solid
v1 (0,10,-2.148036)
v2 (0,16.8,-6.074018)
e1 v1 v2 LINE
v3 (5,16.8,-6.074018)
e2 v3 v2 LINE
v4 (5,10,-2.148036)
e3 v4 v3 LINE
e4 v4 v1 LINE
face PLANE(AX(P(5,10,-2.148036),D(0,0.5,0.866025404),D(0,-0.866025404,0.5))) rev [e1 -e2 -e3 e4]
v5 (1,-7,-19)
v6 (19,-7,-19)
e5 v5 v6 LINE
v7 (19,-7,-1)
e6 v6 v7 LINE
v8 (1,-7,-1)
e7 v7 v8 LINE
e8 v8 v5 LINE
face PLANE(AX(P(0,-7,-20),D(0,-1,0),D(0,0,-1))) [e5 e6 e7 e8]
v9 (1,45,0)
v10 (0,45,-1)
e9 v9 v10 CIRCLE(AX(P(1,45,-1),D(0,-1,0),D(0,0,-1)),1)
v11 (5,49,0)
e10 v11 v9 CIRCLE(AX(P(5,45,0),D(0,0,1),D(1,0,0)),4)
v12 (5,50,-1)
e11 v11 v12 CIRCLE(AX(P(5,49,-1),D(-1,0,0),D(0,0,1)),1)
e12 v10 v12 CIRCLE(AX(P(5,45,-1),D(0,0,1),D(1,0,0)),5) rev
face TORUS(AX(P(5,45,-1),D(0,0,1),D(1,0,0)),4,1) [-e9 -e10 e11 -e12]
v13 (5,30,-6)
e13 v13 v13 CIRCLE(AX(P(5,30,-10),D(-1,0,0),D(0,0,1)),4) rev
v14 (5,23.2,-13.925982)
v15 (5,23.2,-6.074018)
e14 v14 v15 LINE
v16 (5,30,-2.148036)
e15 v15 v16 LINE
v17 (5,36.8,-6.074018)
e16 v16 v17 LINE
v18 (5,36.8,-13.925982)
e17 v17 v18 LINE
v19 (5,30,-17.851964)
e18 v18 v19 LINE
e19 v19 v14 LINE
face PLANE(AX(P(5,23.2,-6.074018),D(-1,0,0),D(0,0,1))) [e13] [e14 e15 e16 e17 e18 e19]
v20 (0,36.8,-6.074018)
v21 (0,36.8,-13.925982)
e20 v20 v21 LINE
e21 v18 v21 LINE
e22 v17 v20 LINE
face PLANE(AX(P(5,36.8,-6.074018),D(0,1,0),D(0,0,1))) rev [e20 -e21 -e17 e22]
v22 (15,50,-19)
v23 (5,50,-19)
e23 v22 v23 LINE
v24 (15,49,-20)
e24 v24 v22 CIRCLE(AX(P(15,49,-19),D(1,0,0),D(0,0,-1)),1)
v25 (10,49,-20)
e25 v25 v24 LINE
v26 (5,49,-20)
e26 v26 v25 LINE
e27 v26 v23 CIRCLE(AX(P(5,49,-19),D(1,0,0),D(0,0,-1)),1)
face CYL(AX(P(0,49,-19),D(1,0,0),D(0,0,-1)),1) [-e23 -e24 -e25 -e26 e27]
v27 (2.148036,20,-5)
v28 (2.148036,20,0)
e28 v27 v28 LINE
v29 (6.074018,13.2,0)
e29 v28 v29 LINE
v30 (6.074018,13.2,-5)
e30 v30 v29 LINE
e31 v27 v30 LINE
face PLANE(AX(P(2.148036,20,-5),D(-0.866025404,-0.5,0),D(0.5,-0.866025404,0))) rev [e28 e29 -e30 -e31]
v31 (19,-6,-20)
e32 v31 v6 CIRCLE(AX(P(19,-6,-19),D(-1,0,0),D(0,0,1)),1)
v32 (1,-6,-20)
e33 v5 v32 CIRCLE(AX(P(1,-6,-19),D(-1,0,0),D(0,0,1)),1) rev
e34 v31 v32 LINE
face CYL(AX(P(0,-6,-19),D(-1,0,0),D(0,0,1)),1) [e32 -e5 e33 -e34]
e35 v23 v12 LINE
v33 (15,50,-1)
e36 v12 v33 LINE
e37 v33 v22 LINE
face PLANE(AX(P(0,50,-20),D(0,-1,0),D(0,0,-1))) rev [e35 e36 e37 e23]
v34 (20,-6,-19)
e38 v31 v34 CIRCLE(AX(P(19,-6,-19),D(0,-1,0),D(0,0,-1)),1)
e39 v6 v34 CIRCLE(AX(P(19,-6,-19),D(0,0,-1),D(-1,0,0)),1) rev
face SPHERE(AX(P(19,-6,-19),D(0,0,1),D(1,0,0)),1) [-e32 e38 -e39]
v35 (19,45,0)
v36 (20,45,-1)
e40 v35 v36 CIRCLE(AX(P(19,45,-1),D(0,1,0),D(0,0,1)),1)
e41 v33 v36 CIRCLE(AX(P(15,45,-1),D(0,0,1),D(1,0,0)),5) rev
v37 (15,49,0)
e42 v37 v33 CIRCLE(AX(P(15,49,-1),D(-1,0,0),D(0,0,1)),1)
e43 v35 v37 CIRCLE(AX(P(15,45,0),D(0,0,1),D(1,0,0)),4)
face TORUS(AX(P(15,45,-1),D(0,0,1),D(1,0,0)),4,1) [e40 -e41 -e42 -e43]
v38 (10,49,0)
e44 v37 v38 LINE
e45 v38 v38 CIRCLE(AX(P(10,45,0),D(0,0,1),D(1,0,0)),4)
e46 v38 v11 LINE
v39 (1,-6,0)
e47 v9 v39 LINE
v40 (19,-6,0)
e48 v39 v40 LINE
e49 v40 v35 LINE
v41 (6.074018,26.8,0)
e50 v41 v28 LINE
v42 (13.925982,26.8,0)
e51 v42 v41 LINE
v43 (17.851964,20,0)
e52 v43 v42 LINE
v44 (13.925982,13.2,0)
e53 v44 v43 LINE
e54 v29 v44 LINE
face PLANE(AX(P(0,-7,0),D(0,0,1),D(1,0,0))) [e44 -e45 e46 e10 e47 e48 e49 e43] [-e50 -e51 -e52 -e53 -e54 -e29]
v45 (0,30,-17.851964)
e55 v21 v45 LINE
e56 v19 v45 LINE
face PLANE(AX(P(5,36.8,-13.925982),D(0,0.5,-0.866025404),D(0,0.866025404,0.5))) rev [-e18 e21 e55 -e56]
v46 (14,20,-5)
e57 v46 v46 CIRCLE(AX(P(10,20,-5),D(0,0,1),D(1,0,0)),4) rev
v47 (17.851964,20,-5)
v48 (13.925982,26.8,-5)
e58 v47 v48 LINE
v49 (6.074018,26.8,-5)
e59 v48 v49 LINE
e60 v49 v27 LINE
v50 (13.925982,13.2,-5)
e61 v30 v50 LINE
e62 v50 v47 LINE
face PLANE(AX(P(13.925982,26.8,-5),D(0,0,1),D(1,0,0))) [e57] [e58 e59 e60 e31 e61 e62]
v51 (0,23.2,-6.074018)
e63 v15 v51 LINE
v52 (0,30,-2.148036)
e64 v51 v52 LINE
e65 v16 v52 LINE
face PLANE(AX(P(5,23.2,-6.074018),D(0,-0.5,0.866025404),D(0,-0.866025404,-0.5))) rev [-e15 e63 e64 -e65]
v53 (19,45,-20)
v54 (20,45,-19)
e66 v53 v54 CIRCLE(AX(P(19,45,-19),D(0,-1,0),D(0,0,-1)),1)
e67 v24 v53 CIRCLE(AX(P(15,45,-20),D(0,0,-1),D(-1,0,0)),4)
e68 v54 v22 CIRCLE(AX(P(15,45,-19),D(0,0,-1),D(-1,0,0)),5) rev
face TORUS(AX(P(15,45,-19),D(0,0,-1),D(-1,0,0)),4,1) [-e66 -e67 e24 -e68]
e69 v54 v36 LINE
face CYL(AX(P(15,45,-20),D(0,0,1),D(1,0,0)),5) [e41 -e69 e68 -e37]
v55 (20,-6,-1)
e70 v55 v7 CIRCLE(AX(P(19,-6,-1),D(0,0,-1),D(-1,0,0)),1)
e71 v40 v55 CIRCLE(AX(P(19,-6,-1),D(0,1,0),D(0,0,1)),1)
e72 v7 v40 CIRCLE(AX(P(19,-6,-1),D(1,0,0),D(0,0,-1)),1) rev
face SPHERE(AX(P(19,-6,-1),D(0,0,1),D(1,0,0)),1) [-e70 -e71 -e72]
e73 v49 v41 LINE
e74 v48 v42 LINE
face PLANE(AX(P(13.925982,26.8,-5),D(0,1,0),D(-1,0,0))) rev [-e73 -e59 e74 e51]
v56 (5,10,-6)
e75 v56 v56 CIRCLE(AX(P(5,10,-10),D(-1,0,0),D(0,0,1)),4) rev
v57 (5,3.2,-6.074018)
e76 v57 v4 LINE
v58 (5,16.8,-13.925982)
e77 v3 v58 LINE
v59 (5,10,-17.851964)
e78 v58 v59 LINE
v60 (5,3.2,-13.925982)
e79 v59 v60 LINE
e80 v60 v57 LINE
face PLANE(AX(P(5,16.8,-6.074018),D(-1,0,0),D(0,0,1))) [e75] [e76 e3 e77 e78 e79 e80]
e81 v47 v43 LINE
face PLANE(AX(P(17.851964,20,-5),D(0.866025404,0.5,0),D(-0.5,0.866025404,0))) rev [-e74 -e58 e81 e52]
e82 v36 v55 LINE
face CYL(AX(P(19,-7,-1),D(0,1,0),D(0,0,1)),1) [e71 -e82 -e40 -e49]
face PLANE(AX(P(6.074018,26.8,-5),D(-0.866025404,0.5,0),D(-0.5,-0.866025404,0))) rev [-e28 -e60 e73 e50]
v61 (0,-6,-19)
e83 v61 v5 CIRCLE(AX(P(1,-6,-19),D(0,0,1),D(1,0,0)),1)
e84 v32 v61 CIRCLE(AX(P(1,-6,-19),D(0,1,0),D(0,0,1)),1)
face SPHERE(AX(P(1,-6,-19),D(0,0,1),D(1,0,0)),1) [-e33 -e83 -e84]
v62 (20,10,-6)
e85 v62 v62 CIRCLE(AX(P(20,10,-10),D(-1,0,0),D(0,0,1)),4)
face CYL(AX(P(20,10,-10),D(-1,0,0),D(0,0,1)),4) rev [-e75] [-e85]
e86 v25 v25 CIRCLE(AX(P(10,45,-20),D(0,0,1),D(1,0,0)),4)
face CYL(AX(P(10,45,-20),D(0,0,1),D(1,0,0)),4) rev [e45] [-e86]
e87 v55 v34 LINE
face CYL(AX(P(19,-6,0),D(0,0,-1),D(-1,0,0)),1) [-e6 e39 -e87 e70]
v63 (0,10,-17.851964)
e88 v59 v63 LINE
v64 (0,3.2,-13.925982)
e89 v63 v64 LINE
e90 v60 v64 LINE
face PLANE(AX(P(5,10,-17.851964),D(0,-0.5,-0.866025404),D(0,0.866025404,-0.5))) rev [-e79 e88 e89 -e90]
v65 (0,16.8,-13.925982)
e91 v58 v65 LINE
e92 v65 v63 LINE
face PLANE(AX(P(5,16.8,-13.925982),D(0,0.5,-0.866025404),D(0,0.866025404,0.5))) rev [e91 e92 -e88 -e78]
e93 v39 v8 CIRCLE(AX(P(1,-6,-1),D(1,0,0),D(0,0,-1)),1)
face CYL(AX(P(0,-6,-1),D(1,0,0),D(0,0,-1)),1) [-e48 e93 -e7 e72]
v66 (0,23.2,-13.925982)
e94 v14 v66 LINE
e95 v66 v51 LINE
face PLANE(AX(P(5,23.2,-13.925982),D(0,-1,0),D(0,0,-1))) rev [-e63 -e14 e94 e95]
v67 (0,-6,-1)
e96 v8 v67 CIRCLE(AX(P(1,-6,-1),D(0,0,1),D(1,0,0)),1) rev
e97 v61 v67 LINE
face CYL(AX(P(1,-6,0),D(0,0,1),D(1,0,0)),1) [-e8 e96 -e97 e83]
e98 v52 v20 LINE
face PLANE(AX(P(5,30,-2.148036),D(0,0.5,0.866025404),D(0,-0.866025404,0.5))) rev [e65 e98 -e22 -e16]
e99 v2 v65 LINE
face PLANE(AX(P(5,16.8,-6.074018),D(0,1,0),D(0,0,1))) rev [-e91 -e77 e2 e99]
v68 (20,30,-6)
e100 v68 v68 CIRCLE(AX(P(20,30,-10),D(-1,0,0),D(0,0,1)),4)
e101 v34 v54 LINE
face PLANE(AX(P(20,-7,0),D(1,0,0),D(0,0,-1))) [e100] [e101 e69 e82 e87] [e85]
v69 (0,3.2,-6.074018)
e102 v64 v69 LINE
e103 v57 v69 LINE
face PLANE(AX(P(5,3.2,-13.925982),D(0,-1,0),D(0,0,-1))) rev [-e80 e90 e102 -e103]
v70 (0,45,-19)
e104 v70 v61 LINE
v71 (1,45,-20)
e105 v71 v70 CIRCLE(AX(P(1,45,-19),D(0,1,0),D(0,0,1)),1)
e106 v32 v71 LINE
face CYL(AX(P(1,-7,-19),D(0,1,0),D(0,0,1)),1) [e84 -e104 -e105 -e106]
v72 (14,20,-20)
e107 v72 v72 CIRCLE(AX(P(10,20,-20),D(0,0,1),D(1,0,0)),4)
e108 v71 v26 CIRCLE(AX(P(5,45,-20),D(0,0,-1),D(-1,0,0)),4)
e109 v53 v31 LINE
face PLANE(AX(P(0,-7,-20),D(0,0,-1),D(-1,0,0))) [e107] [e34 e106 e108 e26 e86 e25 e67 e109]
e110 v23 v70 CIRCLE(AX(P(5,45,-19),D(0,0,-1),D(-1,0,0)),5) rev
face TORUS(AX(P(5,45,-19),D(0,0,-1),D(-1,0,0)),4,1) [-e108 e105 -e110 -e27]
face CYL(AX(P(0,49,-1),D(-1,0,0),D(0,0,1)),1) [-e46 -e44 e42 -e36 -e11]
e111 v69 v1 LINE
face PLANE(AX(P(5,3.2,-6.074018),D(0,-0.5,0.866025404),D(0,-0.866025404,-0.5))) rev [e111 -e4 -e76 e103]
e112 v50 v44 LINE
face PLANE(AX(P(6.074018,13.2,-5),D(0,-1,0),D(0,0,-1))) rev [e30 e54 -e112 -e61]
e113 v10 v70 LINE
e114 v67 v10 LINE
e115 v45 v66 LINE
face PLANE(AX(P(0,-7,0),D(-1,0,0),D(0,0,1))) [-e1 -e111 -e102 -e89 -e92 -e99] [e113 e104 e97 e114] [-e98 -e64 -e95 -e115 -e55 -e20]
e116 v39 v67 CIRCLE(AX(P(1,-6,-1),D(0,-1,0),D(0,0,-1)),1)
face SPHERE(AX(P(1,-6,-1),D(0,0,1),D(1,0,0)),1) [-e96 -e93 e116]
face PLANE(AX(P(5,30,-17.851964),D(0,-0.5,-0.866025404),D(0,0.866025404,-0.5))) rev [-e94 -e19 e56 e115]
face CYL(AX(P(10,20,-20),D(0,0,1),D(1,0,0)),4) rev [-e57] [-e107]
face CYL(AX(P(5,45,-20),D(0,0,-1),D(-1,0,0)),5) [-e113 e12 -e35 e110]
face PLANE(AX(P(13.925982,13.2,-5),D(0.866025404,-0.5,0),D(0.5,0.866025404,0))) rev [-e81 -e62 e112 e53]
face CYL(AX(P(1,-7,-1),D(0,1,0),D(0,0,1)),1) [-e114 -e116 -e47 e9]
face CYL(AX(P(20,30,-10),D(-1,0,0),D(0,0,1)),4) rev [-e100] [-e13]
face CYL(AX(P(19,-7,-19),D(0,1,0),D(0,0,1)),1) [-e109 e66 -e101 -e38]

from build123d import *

# Parameters (mm, degrees)
SALIENTE_EXTRUIR1_DEPTH      = 50
SALIENTE_EXTRUIR1_DEPTH_BACK = 7
CROQUIS1_W                   = 20
CROQUIS1_H                   = 20
CROQUIS2_R                   = 4
CORTAR_EXTRUIR1_DEPTH        = 58.445626465
CORTAR_EXTRUIR2_DEPTH        = 5
CROQUIS4_R                   = 4
CORTAR_EXTRUIR3_DEPTH        = 58.445626465
CORTAR_EXTRUIR4_DEPTH        = 5
REDONDEO1_R                  = 5
REDONDEO2_R                  = 1
REDONDEO3_R                  = 1


with BuildPart() as part:
    # Croquis1 → Saliente-Extruir1 (new, two sides: drawn at the far end of the back side and taken through both)
    with BuildSketch(Plane(origin=(0, 0, 0), x_dir=(1, 0, 0), z_dir=(0, 1, 0)).offset(-SALIENTE_EXTRUIR1_DEPTH_BACK)):
        with Locations((10, 10)):
            Rectangle(CROQUIS1_W, CROQUIS1_H)
    extrude(amount=SALIENTE_EXTRUIR1_DEPTH + SALIENTE_EXTRUIR1_DEPTH_BACK)

    # Croquis2 → Cortar-Extruir1 (cut, through all)
    with BuildSketch(Plane.XY):
        with Locations((10, 45)):
            Circle(CROQUIS2_R)
        with Locations((10, 20)):
            Circle(CROQUIS2_R)
    extrude(amount=-CORTAR_EXTRUIR1_DEPTH, mode=Mode.SUBTRACT)

    # Croquis3 → Cortar-Extruir2 (cut)
    with BuildSketch(Plane.XY):
        Polygon((13.92598183, 26.8), (6.07401817, 26.8), (2.148036339, 20), (6.07401817, 13.2), (13.92598183, 13.2), (17.851963661, 20), align=None)
    extrude(amount=-CORTAR_EXTRUIR2_DEPTH, mode=Mode.SUBTRACT)

    # Croquis4 → Cortar-Extruir3 (cut, through all)
    with BuildSketch(Plane.ZY):
        with Locations((-10, 30)):
            Circle(CROQUIS4_R)
        with Locations((-10, 10)):
            Circle(CROQUIS4_R)
    extrude(amount=-CORTAR_EXTRUIR3_DEPTH, mode=Mode.SUBTRACT)

    # Croquis5 → Cortar-Extruir4 (cut)
    with BuildSketch(Plane.ZY):
        Polygon((-6.07401817, 23.2), (-2.148036339, 30), (-6.07401817, 36.8), (-13.92598183, 36.8), (-17.851963661, 30), (-13.92598183, 23.2), align=None)
        Polygon((-6.07401817, 16.8), (-13.92598183, 16.8), (-17.851963661, 10), (-13.92598183, 3.2), (-6.07401817, 3.2), (-2.148036339, 10), align=None)
    extrude(amount=-CORTAR_EXTRUIR4_DEPTH, mode=Mode.SUBTRACT)

    # Redondeo1
    redondeo1_edges = [part.edges().sort_by_distance(p)[0] for p in [
        (0, 50, -10),
        (20, 50, -10),
    ]]
    fillet(redondeo1_edges, radius=REDONDEO1_R)

    # Redondeo2
    redondeo2_edges = [part.edges().sort_by_distance(p)[0] for p in [
        (20, -7, -10),
        (10, -7, -20),
        (0, -7, -10),
        (10, -7, 0),
    ]]
    fillet(redondeo2_edges, radius=REDONDEO2_R)

    # Redondeo3
    # the kernel refuses this fillet: 1 mm, written as the material it takes off along each edge
    with BuildSketch(Plane(origin=(19, -6, -19), x_dir=(0, 0, -1), z_dir=(1, 0, 0))) as redondeo3_piece_1_section:
        Polygon((0, 0), (REDONDEO3_R, 0), (REDONDEO3_R, -REDONDEO3_R), (0, -REDONDEO3_R), align=None)
    redondeo3_piece_1 = extrude(amount=REDONDEO3_R, mode=Mode.PRIVATE)
    redondeo3_piece_1 = redondeo3_piece_1 - Plane(origin=(19, -6, -19), x_dir=(0, 0.7071067811865475, 0.7071067811865475), z_dir=(1, 0, 0)) * Sphere(REDONDEO3_R, mode=Mode.PRIVATE)
    add(redondeo3_piece_1, mode=Mode.SUBTRACT)
    with BuildSketch(Plane(origin=(19, -6, -1), x_dir=(1, 0, 0), z_dir=(0, 0, 1))) as redondeo3_piece_2_section:
        Polygon((0, 0), (REDONDEO3_R, 0), (REDONDEO3_R, -REDONDEO3_R), (0, -REDONDEO3_R), align=None)
    redondeo3_piece_2 = extrude(amount=REDONDEO3_R, mode=Mode.PRIVATE)
    redondeo3_piece_2 = redondeo3_piece_2 - Plane(origin=(19, -6, -1), x_dir=(-0.7071067811865475, 0.7071067811865475, 0), z_dir=(0, 0, 1)) * Sphere(REDONDEO3_R, mode=Mode.PRIVATE)
    add(redondeo3_piece_2, mode=Mode.SUBTRACT)
    with BuildSketch(Plane(origin=(1, -6, -19), x_dir=(0, 0, -1), z_dir=(-1, 0, 0))) as redondeo3_piece_3_section:
        Polygon((0, 0), (REDONDEO3_R, 0), (REDONDEO3_R, REDONDEO3_R), (0, REDONDEO3_R), align=None)
    redondeo3_piece_3 = extrude(amount=REDONDEO3_R, mode=Mode.PRIVATE)
    redondeo3_piece_3 = redondeo3_piece_3 - Plane(origin=(1, -6, -19), x_dir=(0, 0.7071067811865475, 0.7071067811865475), z_dir=(-1, 0, 0)) * Sphere(REDONDEO3_R, mode=Mode.PRIVATE)
    add(redondeo3_piece_3, mode=Mode.SUBTRACT)
    with BuildSketch(Plane(origin=(1, -6, -1), x_dir=(-1, 0, 0), z_dir=(0, 0, 1))) as redondeo3_piece_4_section:
        Polygon((0, 0), (REDONDEO3_R, 0), (REDONDEO3_R, REDONDEO3_R), (0, REDONDEO3_R), align=None)
    redondeo3_piece_4 = extrude(amount=REDONDEO3_R, mode=Mode.PRIVATE)
    redondeo3_piece_4 = redondeo3_piece_4 - Plane(origin=(1, -6, -1), x_dir=(0.7071067811865475, 0.7071067811865475, 0), z_dir=(0, 0, 1)) * Sphere(REDONDEO3_R, mode=Mode.PRIVATE)
    add(redondeo3_piece_4, mode=Mode.SUBTRACT)
    with BuildSketch(Plane(origin=(5, 50, 0), x_dir=(0, -1, 0), z_dir=(1, 0, 0))) as redondeo3_piece_5:
        with BuildLine():
            CenterArc((REDONDEO3_R, REDONDEO3_R), REDONDEO3_R, 180, 90)
            Line((0, REDONDEO3_R), (0, 0))
            Line((0, 0), (REDONDEO3_R, 0))
        make_face()
    extrude(amount=10, mode=Mode.SUBTRACT)
    with BuildSketch(Plane(origin=(15, 50, -20), x_dir=(0, 0, 1), z_dir=(-1, 0, 0))) as redondeo3_piece_6:
        with BuildLine():
            CenterArc((REDONDEO3_R, -REDONDEO3_R), REDONDEO3_R, 90, 90)
            Line((0, -REDONDEO3_R), (0, 0))
            Line((0, 0), (REDONDEO3_R, 0))
        make_face()
    extrude(amount=10, mode=Mode.SUBTRACT)
    with BuildSketch(Plane(origin=(5, 45, -20), x_dir=(-1, 0, 0), z_dir=(0, -1, 0))) as redondeo3_piece_7:
        with BuildLine():
            CenterArc((5 - REDONDEO3_R, -REDONDEO3_R), REDONDEO3_R, 0, 90)
            Line((5 - REDONDEO3_R, 0), (5, 0))
            Line((5, 0), (5, -REDONDEO3_R))
        make_face()
    revolve(axis=Axis((5, 45, -20), (0, 0, -1)), revolution_arc=90, mode=Mode.SUBTRACT)
    with BuildSketch(Plane(origin=(15, 45, -20), x_dir=(0, 1, 0), z_dir=(-1, 0, 0))) as redondeo3_piece_8:
        with BuildLine():
            CenterArc((5 - REDONDEO3_R, -REDONDEO3_R), REDONDEO3_R, 0, 90)
            Line((5 - REDONDEO3_R, 0), (5, 0))
            Line((5, 0), (5, -REDONDEO3_R))
        make_face()
    revolve(axis=Axis((15, 45, -20), (0, 0, -1)), revolution_arc=90, mode=Mode.SUBTRACT)
    with BuildSketch(Plane(origin=(5, 45, 0), x_dir=(-1, 0, 0), z_dir=(0, -1, 0))) as redondeo3_piece_9:
        with BuildLine():
            CenterArc((5 - REDONDEO3_R, REDONDEO3_R), REDONDEO3_R, 270, 90)
            Line((5, REDONDEO3_R), (5, 0))
            Line((5, 0), (5 - REDONDEO3_R, 0))
        make_face()
    revolve(axis=Axis((5, 45, 0), (0, 0, -1)), revolution_arc=90, mode=Mode.SUBTRACT)
    with BuildSketch(Plane(origin=(15, 45, 0), x_dir=(0, 1, 0), z_dir=(-1, 0, 0))) as redondeo3_piece_10:
        with BuildLine():
            CenterArc((5 - REDONDEO3_R, REDONDEO3_R), REDONDEO3_R, 270, 90)
            Line((5, REDONDEO3_R), (5, 0))
            Line((5, 0), (5 - REDONDEO3_R, 0))
        make_face()
    revolve(axis=Axis((15, 45, 0), (0, 0, -1)), revolution_arc=90, mode=Mode.SUBTRACT)
    with BuildSketch(Plane(origin=(0, 45, 0), x_dir=(1, 0, 0), z_dir=(0, -1, 0)), Plane(origin=(0, 45, -20), x_dir=(0, 0, 1), z_dir=(0, -1, 0)), Plane(origin=(20, -6, -20), x_dir=(0, 0, 1), z_dir=(0, 1, 0)), Plane(origin=(20, -6, 0), x_dir=(-1, 0, 0), z_dir=(0, 1, 0))) as redondeo3_piece_11:
        with BuildLine():
            CenterArc((REDONDEO3_R, -REDONDEO3_R), REDONDEO3_R, 90, 90)
            Line((0, -REDONDEO3_R), (0, 0))
            Line((0, 0), (REDONDEO3_R, 0))
        make_face()
    extrude(amount=51, mode=Mode.SUBTRACT)


solid = part.part
